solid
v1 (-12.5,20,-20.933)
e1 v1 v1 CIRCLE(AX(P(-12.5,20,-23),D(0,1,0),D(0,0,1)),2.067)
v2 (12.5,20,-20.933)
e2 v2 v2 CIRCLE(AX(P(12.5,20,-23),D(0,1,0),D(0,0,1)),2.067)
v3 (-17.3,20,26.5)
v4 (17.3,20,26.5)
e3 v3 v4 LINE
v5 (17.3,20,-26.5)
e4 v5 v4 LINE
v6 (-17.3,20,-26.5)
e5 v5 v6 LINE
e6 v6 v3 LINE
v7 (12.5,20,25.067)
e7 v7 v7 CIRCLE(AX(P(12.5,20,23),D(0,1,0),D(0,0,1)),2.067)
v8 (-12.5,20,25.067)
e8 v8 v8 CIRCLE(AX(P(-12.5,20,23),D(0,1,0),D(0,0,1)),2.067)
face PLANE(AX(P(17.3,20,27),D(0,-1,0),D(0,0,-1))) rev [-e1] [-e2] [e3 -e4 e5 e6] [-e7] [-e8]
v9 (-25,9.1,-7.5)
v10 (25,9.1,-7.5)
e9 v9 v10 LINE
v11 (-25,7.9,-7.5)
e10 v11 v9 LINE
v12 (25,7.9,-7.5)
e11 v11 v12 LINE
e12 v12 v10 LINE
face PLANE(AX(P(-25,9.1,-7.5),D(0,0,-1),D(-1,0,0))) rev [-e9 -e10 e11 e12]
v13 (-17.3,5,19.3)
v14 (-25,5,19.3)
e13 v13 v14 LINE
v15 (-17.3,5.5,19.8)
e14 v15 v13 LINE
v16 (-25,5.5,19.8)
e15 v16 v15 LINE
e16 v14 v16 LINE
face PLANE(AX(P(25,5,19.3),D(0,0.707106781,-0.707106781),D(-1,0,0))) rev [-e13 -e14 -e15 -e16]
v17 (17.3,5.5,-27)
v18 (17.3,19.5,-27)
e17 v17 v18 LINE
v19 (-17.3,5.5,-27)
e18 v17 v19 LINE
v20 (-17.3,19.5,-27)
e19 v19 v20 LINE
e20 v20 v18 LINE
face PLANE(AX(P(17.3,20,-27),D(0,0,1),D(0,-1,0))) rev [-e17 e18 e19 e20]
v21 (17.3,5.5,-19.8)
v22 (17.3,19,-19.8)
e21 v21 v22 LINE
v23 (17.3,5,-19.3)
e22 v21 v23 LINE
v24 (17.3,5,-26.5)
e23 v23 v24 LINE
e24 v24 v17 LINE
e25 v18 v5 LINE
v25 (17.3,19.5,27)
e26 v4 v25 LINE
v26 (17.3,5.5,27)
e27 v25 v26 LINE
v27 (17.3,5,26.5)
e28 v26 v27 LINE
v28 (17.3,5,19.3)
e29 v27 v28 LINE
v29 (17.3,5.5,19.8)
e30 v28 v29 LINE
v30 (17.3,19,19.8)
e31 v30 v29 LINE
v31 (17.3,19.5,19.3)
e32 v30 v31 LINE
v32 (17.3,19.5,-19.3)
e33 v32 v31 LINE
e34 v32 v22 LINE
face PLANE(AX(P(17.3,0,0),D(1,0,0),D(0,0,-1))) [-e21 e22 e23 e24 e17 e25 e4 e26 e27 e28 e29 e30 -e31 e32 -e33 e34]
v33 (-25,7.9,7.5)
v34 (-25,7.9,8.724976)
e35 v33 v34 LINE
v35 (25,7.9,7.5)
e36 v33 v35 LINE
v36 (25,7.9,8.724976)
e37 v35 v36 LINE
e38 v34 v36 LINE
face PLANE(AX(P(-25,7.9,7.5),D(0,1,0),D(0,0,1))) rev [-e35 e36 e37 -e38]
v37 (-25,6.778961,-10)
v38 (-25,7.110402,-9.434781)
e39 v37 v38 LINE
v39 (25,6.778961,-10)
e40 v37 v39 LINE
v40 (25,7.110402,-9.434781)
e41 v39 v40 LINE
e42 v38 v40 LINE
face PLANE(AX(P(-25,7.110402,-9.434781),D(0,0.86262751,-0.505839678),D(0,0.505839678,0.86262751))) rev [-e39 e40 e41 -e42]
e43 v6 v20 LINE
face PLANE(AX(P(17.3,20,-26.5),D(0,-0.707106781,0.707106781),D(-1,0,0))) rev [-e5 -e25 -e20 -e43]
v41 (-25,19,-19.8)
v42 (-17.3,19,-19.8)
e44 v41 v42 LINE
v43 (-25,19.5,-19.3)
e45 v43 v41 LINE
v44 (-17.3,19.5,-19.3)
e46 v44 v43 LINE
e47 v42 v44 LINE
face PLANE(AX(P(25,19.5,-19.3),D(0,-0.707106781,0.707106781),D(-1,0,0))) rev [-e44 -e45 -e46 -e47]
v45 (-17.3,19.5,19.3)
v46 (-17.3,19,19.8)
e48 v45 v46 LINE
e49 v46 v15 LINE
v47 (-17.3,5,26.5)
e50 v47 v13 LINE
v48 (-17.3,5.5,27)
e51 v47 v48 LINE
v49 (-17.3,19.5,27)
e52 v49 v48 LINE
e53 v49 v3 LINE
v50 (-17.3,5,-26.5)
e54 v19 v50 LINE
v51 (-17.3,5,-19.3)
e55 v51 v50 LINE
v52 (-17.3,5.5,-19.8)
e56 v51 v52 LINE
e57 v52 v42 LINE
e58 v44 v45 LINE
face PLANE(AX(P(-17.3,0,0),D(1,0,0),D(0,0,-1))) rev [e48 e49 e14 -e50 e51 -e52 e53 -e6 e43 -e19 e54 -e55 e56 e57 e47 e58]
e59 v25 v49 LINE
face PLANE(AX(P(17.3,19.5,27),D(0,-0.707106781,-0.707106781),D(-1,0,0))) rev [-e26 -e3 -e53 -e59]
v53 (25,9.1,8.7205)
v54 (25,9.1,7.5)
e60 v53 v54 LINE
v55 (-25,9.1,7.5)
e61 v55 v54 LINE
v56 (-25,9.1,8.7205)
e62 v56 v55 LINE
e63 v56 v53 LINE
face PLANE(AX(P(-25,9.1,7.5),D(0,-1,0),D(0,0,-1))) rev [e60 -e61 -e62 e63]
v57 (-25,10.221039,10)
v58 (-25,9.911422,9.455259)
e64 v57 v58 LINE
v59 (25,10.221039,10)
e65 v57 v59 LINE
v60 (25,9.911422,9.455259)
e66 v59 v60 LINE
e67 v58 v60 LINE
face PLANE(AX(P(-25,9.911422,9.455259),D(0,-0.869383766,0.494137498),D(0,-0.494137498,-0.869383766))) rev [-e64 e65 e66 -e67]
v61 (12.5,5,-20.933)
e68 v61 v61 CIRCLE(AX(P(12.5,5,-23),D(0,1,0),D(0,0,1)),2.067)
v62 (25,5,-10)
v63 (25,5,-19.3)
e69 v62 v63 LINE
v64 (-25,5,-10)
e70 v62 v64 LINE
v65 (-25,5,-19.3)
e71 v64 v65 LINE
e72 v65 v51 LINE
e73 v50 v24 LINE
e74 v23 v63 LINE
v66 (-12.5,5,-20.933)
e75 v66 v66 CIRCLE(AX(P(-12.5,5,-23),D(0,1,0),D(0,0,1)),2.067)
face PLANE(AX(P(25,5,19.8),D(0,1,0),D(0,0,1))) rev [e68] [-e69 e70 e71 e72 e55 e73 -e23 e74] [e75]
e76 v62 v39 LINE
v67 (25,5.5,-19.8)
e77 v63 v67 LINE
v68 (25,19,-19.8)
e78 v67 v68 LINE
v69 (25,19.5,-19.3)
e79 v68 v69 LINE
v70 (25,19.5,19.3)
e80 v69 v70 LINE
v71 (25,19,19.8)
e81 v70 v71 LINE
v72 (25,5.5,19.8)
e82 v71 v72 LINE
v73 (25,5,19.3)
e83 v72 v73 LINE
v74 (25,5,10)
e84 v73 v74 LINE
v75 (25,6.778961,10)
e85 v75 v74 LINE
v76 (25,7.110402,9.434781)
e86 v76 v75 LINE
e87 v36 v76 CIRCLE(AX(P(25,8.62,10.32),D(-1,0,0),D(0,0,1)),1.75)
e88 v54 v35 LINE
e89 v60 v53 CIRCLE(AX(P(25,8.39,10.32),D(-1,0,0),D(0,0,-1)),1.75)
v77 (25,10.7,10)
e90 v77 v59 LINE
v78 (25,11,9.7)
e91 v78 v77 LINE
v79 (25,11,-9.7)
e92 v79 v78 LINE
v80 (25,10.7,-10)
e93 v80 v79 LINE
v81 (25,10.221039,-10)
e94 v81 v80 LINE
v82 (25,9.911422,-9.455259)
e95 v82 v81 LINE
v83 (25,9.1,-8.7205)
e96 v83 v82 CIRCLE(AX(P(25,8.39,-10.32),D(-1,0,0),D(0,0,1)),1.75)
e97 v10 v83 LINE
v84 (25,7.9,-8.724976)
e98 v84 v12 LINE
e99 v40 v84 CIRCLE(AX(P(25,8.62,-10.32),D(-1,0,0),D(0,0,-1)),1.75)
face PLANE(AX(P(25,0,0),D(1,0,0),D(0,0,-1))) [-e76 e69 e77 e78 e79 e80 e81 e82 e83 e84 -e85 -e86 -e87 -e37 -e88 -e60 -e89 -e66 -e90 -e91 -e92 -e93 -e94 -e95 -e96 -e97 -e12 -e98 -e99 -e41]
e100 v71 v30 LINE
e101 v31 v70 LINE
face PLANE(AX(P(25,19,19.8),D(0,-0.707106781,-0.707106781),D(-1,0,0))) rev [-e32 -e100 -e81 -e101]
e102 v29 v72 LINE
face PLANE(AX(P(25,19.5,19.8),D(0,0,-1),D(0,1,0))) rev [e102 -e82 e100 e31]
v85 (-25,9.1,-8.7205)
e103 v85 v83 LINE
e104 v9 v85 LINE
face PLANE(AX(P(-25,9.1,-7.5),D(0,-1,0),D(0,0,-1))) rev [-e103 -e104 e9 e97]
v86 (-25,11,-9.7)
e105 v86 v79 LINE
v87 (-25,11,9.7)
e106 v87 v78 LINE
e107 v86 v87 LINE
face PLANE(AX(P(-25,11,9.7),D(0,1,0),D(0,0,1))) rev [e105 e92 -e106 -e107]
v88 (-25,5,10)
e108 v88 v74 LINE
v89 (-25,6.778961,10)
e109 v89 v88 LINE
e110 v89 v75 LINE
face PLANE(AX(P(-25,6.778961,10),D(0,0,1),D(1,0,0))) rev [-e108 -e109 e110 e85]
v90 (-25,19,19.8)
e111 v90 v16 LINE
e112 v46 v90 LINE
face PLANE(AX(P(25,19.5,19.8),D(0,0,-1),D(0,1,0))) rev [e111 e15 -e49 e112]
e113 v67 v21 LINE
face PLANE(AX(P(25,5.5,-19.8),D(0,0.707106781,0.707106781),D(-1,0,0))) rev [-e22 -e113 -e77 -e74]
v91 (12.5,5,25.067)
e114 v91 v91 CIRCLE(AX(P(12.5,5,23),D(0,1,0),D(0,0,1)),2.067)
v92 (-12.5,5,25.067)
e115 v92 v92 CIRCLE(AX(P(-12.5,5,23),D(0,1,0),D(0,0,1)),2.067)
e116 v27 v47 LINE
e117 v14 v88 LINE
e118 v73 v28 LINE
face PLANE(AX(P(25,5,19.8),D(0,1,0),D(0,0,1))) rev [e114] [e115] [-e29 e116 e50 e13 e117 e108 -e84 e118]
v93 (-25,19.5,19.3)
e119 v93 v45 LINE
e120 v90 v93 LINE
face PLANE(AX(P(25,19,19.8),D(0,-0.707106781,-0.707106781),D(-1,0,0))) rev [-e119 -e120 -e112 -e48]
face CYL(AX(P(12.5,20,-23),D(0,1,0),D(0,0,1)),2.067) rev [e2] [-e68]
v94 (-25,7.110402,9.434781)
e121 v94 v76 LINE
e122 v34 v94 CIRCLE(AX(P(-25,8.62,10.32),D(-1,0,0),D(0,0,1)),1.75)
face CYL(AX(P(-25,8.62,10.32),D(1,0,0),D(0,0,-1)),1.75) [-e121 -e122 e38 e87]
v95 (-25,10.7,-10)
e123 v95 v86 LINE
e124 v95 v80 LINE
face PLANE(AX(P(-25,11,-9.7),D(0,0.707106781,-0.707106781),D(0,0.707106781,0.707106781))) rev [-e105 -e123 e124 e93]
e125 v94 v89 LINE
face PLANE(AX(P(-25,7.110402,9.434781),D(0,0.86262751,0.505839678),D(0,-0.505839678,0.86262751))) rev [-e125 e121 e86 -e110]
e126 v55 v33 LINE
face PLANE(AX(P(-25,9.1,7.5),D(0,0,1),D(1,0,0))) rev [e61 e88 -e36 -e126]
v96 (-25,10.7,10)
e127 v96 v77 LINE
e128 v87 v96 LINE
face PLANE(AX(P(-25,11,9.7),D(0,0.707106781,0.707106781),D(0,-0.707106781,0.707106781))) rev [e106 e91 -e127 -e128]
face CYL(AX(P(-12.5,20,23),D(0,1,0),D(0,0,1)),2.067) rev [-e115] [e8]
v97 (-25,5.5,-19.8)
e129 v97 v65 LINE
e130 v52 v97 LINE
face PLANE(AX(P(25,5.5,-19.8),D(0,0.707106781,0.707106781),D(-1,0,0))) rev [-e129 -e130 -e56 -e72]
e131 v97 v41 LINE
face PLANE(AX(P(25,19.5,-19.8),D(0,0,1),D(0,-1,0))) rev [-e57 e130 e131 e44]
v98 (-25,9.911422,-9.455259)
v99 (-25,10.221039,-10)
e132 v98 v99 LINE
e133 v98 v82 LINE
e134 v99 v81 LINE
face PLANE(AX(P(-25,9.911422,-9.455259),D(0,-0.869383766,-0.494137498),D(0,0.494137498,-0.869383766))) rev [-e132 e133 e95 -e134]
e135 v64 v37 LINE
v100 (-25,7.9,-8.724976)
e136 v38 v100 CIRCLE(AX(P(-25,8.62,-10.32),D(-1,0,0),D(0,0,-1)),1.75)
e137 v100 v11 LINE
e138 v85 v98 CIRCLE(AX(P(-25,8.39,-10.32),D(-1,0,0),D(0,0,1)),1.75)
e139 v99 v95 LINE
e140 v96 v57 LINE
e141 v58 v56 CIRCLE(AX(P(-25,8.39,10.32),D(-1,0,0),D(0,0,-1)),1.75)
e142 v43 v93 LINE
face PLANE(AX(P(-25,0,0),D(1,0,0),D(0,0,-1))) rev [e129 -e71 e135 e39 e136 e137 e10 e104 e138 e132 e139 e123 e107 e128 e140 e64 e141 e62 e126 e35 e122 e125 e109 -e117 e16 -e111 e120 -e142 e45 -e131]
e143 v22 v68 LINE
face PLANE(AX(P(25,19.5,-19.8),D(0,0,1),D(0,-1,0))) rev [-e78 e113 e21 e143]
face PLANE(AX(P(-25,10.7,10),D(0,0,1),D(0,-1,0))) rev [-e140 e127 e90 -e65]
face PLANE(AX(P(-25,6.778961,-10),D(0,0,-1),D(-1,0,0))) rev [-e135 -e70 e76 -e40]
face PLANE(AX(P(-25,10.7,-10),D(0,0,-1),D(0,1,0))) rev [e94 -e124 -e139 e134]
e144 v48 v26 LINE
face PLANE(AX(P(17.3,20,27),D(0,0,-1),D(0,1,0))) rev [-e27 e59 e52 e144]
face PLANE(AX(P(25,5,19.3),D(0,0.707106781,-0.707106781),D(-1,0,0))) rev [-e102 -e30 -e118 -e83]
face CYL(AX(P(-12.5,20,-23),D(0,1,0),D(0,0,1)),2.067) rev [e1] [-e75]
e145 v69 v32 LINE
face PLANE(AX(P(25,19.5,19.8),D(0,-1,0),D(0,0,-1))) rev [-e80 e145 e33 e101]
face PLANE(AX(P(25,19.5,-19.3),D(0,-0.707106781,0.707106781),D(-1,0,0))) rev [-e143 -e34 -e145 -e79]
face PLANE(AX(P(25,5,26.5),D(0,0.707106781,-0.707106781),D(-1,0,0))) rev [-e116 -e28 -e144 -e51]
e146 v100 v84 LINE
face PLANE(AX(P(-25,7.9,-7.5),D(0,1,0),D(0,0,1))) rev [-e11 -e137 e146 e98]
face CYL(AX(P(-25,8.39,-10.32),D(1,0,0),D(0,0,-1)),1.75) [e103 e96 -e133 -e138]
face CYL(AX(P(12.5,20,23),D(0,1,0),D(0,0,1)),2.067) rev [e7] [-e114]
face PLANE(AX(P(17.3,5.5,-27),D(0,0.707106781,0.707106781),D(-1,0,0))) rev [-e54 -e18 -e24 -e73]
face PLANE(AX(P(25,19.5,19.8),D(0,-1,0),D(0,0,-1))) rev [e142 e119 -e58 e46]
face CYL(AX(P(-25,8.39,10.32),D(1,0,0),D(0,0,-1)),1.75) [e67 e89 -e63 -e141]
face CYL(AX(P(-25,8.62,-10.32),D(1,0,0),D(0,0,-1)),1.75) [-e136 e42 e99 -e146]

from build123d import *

# Parameters (mm, degrees)
SKETCH1_W               = 39.6
SKETCH1_H               = 14.5
BOSS_EXTRUDE1_DEPTH     = 25
SKETCH2_W               = 54
SKETCH2_H               = 15
BOSS_EXTRUDE2_DEPTH     = 17.3
CUT_EXTRUDE1_DEPTH      = 42.880783183
CUT_EXTRUDE1_DEPTH_BACK = 42.880783183
CHAMFER1_SIZE           = 0.5
CHAMFER2_SIZE           = 0.5
CHAMFER3_SIZE           = 0.5
CHAMFER4_SIZE           = 0.5
TAP1_D                  = 4.134
LPATTERN1_COUNT         = 2
LPATTERN1_PITCH         = 25
LPATTERN1_COUNT_DIR2    = 2
LPATTERN1_PITCH_DIR2    = 46


with BuildPart() as part:
    # Sketch1 → Boss-Extrude1 (new, symmetric)
    with BuildSketch(Plane(origin=(0, 0, 0), x_dir=(0, 0, -1), z_dir=(1, 0, 0))):
        with Locations((0, 12.25)):
            Rectangle(SKETCH1_W, SKETCH1_H)
    extrude(amount=BOSS_EXTRUDE1_DEPTH, both=True)

    # Sketch2 → Boss-Extrude2 (add, symmetric)
    with BuildSketch(Plane(origin=(0, 0, 0), x_dir=(0, 0, -1), z_dir=(1, 0, 0))):
        with Locations((0, 12.5)):
            Rectangle(SKETCH2_W, SKETCH2_H)
    extrude(amount=BOSS_EXTRUDE2_DEPTH, both=True)

    # Sketch3 → Cut-Extrude1 (cut, two sides: drawn at the far end of the back side and taken through both)
    with BuildSketch(Plane(origin=(0, 0, 0), x_dir=(0, 0, -1), z_dir=(1, 0, 0)).offset(-CUT_EXTRUDE1_DEPTH_BACK)):
        with BuildLine():
            Line((-9.7, 11), (9.7, 11))
            Line((9.7, 11), (10, 10.7))
            Line((10, 10.7), (10, 10.221039482))
            Line((10, 10.221039482), (9.455259378, 9.911421591))
            ThreePointArc((9.455259378, 9.911421591), (9.0228024, 9.564639684), (8.720500078, 9.1))
            Line((8.720500078, 9.1), (7.5, 9.1))
            Line((7.5, 9.1), (7.5, 7.9))
            Line((7.5, 7.9), (8.724976489, 7.9))
            ThreePointArc((8.724976489, 7.9), (9.018551739, 7.450071616), (9.434780564, 7.110401858))
            Line((9.434780564, 7.110401858), (10, 6.778960518))
            Line((10, 6.778960518), (10, 0))
            Line((10, 0), (-10, 0))
            Line((-10, 0), (-10, 6.778960518))
            Line((-10, 6.778960518), (-9.434780564, 7.110401858))
            ThreePointArc((-9.434780564, 7.110401858), (-9.018551739, 7.450071616), (-8.724976489, 7.9))
            Line((-8.724976489, 7.9), (-7.5, 7.9))
            Line((-7.5, 7.9), (-7.5, 9.1))
            Line((-7.5, 9.1), (-8.720500078, 9.1))
            ThreePointArc((-8.720500078, 9.1), (-9.0228024, 9.564639684), (-9.455259378, 9.911421591))
            Line((-9.455259378, 9.911421591), (-10, 10.221039482))
            Line((-10, 10.221039482), (-10, 10.7))
            Line((-10, 10.7), (-9.7, 11))
        make_face()
    extrude(amount=CUT_EXTRUDE1_DEPTH + CUT_EXTRUDE1_DEPTH_BACK, mode=Mode.SUBTRACT)

    # Chamfer1
    chamfer1_edges = [part.edges().sort_by_distance(p)[0] for p in [
        (-21.15, 19.5, 19.8),
        (-21.15, 19.5, -19.8),
        (21.15, 19.5, 19.8),
        (21.15, 19.5, -19.8),
    ]]
    chamfer(chamfer1_edges, length=CHAMFER1_SIZE)

    # Chamfer2
    chamfer2_edges = [part.edges().sort_by_distance(p)[0] for p in [
        (0, 20, 27),
        (0, 20, -27),
    ]]
    chamfer(chamfer2_edges, length=CHAMFER2_SIZE)

    # Chamfer3
    chamfer3_edges = [part.edges().sort_by_distance(p)[0] for p in [
        (-21.15, 5, -19.8),
        (-21.15, 5, 19.8),
        (21.15, 5, -19.8),
        (21.15, 5, 19.8),
    ]]
    chamfer(chamfer3_edges, length=CHAMFER3_SIZE)

    # Chamfer4
    chamfer4_edges = [part.edges().sort_by_distance(p)[0] for p in [
        (0, 5, 27),
        (0, 5, -27),
    ]]
    chamfer(chamfer4_edges, length=CHAMFER4_SIZE)

    # Tap1 (through all)
    with Locations(Plane(origin=(0, 20, 0), x_dir=(1, 0, 0), z_dir=(0, 1, 0))):
        with Locations((-12.5, 23)):
            tap1 = Hole(TAP1_D / 2)

    # LPattern1: Tap1 2 × 2
    with Locations(*[(i * LPATTERN1_PITCH, 0, j * LPATTERN1_PITCH_DIR2) for i in range(LPATTERN1_COUNT) for j in range(LPATTERN1_COUNT_DIR2) if (i, j) != (0, 0)]):
        add(tap1, mode=Mode.SUBTRACT)


solid = part.part
